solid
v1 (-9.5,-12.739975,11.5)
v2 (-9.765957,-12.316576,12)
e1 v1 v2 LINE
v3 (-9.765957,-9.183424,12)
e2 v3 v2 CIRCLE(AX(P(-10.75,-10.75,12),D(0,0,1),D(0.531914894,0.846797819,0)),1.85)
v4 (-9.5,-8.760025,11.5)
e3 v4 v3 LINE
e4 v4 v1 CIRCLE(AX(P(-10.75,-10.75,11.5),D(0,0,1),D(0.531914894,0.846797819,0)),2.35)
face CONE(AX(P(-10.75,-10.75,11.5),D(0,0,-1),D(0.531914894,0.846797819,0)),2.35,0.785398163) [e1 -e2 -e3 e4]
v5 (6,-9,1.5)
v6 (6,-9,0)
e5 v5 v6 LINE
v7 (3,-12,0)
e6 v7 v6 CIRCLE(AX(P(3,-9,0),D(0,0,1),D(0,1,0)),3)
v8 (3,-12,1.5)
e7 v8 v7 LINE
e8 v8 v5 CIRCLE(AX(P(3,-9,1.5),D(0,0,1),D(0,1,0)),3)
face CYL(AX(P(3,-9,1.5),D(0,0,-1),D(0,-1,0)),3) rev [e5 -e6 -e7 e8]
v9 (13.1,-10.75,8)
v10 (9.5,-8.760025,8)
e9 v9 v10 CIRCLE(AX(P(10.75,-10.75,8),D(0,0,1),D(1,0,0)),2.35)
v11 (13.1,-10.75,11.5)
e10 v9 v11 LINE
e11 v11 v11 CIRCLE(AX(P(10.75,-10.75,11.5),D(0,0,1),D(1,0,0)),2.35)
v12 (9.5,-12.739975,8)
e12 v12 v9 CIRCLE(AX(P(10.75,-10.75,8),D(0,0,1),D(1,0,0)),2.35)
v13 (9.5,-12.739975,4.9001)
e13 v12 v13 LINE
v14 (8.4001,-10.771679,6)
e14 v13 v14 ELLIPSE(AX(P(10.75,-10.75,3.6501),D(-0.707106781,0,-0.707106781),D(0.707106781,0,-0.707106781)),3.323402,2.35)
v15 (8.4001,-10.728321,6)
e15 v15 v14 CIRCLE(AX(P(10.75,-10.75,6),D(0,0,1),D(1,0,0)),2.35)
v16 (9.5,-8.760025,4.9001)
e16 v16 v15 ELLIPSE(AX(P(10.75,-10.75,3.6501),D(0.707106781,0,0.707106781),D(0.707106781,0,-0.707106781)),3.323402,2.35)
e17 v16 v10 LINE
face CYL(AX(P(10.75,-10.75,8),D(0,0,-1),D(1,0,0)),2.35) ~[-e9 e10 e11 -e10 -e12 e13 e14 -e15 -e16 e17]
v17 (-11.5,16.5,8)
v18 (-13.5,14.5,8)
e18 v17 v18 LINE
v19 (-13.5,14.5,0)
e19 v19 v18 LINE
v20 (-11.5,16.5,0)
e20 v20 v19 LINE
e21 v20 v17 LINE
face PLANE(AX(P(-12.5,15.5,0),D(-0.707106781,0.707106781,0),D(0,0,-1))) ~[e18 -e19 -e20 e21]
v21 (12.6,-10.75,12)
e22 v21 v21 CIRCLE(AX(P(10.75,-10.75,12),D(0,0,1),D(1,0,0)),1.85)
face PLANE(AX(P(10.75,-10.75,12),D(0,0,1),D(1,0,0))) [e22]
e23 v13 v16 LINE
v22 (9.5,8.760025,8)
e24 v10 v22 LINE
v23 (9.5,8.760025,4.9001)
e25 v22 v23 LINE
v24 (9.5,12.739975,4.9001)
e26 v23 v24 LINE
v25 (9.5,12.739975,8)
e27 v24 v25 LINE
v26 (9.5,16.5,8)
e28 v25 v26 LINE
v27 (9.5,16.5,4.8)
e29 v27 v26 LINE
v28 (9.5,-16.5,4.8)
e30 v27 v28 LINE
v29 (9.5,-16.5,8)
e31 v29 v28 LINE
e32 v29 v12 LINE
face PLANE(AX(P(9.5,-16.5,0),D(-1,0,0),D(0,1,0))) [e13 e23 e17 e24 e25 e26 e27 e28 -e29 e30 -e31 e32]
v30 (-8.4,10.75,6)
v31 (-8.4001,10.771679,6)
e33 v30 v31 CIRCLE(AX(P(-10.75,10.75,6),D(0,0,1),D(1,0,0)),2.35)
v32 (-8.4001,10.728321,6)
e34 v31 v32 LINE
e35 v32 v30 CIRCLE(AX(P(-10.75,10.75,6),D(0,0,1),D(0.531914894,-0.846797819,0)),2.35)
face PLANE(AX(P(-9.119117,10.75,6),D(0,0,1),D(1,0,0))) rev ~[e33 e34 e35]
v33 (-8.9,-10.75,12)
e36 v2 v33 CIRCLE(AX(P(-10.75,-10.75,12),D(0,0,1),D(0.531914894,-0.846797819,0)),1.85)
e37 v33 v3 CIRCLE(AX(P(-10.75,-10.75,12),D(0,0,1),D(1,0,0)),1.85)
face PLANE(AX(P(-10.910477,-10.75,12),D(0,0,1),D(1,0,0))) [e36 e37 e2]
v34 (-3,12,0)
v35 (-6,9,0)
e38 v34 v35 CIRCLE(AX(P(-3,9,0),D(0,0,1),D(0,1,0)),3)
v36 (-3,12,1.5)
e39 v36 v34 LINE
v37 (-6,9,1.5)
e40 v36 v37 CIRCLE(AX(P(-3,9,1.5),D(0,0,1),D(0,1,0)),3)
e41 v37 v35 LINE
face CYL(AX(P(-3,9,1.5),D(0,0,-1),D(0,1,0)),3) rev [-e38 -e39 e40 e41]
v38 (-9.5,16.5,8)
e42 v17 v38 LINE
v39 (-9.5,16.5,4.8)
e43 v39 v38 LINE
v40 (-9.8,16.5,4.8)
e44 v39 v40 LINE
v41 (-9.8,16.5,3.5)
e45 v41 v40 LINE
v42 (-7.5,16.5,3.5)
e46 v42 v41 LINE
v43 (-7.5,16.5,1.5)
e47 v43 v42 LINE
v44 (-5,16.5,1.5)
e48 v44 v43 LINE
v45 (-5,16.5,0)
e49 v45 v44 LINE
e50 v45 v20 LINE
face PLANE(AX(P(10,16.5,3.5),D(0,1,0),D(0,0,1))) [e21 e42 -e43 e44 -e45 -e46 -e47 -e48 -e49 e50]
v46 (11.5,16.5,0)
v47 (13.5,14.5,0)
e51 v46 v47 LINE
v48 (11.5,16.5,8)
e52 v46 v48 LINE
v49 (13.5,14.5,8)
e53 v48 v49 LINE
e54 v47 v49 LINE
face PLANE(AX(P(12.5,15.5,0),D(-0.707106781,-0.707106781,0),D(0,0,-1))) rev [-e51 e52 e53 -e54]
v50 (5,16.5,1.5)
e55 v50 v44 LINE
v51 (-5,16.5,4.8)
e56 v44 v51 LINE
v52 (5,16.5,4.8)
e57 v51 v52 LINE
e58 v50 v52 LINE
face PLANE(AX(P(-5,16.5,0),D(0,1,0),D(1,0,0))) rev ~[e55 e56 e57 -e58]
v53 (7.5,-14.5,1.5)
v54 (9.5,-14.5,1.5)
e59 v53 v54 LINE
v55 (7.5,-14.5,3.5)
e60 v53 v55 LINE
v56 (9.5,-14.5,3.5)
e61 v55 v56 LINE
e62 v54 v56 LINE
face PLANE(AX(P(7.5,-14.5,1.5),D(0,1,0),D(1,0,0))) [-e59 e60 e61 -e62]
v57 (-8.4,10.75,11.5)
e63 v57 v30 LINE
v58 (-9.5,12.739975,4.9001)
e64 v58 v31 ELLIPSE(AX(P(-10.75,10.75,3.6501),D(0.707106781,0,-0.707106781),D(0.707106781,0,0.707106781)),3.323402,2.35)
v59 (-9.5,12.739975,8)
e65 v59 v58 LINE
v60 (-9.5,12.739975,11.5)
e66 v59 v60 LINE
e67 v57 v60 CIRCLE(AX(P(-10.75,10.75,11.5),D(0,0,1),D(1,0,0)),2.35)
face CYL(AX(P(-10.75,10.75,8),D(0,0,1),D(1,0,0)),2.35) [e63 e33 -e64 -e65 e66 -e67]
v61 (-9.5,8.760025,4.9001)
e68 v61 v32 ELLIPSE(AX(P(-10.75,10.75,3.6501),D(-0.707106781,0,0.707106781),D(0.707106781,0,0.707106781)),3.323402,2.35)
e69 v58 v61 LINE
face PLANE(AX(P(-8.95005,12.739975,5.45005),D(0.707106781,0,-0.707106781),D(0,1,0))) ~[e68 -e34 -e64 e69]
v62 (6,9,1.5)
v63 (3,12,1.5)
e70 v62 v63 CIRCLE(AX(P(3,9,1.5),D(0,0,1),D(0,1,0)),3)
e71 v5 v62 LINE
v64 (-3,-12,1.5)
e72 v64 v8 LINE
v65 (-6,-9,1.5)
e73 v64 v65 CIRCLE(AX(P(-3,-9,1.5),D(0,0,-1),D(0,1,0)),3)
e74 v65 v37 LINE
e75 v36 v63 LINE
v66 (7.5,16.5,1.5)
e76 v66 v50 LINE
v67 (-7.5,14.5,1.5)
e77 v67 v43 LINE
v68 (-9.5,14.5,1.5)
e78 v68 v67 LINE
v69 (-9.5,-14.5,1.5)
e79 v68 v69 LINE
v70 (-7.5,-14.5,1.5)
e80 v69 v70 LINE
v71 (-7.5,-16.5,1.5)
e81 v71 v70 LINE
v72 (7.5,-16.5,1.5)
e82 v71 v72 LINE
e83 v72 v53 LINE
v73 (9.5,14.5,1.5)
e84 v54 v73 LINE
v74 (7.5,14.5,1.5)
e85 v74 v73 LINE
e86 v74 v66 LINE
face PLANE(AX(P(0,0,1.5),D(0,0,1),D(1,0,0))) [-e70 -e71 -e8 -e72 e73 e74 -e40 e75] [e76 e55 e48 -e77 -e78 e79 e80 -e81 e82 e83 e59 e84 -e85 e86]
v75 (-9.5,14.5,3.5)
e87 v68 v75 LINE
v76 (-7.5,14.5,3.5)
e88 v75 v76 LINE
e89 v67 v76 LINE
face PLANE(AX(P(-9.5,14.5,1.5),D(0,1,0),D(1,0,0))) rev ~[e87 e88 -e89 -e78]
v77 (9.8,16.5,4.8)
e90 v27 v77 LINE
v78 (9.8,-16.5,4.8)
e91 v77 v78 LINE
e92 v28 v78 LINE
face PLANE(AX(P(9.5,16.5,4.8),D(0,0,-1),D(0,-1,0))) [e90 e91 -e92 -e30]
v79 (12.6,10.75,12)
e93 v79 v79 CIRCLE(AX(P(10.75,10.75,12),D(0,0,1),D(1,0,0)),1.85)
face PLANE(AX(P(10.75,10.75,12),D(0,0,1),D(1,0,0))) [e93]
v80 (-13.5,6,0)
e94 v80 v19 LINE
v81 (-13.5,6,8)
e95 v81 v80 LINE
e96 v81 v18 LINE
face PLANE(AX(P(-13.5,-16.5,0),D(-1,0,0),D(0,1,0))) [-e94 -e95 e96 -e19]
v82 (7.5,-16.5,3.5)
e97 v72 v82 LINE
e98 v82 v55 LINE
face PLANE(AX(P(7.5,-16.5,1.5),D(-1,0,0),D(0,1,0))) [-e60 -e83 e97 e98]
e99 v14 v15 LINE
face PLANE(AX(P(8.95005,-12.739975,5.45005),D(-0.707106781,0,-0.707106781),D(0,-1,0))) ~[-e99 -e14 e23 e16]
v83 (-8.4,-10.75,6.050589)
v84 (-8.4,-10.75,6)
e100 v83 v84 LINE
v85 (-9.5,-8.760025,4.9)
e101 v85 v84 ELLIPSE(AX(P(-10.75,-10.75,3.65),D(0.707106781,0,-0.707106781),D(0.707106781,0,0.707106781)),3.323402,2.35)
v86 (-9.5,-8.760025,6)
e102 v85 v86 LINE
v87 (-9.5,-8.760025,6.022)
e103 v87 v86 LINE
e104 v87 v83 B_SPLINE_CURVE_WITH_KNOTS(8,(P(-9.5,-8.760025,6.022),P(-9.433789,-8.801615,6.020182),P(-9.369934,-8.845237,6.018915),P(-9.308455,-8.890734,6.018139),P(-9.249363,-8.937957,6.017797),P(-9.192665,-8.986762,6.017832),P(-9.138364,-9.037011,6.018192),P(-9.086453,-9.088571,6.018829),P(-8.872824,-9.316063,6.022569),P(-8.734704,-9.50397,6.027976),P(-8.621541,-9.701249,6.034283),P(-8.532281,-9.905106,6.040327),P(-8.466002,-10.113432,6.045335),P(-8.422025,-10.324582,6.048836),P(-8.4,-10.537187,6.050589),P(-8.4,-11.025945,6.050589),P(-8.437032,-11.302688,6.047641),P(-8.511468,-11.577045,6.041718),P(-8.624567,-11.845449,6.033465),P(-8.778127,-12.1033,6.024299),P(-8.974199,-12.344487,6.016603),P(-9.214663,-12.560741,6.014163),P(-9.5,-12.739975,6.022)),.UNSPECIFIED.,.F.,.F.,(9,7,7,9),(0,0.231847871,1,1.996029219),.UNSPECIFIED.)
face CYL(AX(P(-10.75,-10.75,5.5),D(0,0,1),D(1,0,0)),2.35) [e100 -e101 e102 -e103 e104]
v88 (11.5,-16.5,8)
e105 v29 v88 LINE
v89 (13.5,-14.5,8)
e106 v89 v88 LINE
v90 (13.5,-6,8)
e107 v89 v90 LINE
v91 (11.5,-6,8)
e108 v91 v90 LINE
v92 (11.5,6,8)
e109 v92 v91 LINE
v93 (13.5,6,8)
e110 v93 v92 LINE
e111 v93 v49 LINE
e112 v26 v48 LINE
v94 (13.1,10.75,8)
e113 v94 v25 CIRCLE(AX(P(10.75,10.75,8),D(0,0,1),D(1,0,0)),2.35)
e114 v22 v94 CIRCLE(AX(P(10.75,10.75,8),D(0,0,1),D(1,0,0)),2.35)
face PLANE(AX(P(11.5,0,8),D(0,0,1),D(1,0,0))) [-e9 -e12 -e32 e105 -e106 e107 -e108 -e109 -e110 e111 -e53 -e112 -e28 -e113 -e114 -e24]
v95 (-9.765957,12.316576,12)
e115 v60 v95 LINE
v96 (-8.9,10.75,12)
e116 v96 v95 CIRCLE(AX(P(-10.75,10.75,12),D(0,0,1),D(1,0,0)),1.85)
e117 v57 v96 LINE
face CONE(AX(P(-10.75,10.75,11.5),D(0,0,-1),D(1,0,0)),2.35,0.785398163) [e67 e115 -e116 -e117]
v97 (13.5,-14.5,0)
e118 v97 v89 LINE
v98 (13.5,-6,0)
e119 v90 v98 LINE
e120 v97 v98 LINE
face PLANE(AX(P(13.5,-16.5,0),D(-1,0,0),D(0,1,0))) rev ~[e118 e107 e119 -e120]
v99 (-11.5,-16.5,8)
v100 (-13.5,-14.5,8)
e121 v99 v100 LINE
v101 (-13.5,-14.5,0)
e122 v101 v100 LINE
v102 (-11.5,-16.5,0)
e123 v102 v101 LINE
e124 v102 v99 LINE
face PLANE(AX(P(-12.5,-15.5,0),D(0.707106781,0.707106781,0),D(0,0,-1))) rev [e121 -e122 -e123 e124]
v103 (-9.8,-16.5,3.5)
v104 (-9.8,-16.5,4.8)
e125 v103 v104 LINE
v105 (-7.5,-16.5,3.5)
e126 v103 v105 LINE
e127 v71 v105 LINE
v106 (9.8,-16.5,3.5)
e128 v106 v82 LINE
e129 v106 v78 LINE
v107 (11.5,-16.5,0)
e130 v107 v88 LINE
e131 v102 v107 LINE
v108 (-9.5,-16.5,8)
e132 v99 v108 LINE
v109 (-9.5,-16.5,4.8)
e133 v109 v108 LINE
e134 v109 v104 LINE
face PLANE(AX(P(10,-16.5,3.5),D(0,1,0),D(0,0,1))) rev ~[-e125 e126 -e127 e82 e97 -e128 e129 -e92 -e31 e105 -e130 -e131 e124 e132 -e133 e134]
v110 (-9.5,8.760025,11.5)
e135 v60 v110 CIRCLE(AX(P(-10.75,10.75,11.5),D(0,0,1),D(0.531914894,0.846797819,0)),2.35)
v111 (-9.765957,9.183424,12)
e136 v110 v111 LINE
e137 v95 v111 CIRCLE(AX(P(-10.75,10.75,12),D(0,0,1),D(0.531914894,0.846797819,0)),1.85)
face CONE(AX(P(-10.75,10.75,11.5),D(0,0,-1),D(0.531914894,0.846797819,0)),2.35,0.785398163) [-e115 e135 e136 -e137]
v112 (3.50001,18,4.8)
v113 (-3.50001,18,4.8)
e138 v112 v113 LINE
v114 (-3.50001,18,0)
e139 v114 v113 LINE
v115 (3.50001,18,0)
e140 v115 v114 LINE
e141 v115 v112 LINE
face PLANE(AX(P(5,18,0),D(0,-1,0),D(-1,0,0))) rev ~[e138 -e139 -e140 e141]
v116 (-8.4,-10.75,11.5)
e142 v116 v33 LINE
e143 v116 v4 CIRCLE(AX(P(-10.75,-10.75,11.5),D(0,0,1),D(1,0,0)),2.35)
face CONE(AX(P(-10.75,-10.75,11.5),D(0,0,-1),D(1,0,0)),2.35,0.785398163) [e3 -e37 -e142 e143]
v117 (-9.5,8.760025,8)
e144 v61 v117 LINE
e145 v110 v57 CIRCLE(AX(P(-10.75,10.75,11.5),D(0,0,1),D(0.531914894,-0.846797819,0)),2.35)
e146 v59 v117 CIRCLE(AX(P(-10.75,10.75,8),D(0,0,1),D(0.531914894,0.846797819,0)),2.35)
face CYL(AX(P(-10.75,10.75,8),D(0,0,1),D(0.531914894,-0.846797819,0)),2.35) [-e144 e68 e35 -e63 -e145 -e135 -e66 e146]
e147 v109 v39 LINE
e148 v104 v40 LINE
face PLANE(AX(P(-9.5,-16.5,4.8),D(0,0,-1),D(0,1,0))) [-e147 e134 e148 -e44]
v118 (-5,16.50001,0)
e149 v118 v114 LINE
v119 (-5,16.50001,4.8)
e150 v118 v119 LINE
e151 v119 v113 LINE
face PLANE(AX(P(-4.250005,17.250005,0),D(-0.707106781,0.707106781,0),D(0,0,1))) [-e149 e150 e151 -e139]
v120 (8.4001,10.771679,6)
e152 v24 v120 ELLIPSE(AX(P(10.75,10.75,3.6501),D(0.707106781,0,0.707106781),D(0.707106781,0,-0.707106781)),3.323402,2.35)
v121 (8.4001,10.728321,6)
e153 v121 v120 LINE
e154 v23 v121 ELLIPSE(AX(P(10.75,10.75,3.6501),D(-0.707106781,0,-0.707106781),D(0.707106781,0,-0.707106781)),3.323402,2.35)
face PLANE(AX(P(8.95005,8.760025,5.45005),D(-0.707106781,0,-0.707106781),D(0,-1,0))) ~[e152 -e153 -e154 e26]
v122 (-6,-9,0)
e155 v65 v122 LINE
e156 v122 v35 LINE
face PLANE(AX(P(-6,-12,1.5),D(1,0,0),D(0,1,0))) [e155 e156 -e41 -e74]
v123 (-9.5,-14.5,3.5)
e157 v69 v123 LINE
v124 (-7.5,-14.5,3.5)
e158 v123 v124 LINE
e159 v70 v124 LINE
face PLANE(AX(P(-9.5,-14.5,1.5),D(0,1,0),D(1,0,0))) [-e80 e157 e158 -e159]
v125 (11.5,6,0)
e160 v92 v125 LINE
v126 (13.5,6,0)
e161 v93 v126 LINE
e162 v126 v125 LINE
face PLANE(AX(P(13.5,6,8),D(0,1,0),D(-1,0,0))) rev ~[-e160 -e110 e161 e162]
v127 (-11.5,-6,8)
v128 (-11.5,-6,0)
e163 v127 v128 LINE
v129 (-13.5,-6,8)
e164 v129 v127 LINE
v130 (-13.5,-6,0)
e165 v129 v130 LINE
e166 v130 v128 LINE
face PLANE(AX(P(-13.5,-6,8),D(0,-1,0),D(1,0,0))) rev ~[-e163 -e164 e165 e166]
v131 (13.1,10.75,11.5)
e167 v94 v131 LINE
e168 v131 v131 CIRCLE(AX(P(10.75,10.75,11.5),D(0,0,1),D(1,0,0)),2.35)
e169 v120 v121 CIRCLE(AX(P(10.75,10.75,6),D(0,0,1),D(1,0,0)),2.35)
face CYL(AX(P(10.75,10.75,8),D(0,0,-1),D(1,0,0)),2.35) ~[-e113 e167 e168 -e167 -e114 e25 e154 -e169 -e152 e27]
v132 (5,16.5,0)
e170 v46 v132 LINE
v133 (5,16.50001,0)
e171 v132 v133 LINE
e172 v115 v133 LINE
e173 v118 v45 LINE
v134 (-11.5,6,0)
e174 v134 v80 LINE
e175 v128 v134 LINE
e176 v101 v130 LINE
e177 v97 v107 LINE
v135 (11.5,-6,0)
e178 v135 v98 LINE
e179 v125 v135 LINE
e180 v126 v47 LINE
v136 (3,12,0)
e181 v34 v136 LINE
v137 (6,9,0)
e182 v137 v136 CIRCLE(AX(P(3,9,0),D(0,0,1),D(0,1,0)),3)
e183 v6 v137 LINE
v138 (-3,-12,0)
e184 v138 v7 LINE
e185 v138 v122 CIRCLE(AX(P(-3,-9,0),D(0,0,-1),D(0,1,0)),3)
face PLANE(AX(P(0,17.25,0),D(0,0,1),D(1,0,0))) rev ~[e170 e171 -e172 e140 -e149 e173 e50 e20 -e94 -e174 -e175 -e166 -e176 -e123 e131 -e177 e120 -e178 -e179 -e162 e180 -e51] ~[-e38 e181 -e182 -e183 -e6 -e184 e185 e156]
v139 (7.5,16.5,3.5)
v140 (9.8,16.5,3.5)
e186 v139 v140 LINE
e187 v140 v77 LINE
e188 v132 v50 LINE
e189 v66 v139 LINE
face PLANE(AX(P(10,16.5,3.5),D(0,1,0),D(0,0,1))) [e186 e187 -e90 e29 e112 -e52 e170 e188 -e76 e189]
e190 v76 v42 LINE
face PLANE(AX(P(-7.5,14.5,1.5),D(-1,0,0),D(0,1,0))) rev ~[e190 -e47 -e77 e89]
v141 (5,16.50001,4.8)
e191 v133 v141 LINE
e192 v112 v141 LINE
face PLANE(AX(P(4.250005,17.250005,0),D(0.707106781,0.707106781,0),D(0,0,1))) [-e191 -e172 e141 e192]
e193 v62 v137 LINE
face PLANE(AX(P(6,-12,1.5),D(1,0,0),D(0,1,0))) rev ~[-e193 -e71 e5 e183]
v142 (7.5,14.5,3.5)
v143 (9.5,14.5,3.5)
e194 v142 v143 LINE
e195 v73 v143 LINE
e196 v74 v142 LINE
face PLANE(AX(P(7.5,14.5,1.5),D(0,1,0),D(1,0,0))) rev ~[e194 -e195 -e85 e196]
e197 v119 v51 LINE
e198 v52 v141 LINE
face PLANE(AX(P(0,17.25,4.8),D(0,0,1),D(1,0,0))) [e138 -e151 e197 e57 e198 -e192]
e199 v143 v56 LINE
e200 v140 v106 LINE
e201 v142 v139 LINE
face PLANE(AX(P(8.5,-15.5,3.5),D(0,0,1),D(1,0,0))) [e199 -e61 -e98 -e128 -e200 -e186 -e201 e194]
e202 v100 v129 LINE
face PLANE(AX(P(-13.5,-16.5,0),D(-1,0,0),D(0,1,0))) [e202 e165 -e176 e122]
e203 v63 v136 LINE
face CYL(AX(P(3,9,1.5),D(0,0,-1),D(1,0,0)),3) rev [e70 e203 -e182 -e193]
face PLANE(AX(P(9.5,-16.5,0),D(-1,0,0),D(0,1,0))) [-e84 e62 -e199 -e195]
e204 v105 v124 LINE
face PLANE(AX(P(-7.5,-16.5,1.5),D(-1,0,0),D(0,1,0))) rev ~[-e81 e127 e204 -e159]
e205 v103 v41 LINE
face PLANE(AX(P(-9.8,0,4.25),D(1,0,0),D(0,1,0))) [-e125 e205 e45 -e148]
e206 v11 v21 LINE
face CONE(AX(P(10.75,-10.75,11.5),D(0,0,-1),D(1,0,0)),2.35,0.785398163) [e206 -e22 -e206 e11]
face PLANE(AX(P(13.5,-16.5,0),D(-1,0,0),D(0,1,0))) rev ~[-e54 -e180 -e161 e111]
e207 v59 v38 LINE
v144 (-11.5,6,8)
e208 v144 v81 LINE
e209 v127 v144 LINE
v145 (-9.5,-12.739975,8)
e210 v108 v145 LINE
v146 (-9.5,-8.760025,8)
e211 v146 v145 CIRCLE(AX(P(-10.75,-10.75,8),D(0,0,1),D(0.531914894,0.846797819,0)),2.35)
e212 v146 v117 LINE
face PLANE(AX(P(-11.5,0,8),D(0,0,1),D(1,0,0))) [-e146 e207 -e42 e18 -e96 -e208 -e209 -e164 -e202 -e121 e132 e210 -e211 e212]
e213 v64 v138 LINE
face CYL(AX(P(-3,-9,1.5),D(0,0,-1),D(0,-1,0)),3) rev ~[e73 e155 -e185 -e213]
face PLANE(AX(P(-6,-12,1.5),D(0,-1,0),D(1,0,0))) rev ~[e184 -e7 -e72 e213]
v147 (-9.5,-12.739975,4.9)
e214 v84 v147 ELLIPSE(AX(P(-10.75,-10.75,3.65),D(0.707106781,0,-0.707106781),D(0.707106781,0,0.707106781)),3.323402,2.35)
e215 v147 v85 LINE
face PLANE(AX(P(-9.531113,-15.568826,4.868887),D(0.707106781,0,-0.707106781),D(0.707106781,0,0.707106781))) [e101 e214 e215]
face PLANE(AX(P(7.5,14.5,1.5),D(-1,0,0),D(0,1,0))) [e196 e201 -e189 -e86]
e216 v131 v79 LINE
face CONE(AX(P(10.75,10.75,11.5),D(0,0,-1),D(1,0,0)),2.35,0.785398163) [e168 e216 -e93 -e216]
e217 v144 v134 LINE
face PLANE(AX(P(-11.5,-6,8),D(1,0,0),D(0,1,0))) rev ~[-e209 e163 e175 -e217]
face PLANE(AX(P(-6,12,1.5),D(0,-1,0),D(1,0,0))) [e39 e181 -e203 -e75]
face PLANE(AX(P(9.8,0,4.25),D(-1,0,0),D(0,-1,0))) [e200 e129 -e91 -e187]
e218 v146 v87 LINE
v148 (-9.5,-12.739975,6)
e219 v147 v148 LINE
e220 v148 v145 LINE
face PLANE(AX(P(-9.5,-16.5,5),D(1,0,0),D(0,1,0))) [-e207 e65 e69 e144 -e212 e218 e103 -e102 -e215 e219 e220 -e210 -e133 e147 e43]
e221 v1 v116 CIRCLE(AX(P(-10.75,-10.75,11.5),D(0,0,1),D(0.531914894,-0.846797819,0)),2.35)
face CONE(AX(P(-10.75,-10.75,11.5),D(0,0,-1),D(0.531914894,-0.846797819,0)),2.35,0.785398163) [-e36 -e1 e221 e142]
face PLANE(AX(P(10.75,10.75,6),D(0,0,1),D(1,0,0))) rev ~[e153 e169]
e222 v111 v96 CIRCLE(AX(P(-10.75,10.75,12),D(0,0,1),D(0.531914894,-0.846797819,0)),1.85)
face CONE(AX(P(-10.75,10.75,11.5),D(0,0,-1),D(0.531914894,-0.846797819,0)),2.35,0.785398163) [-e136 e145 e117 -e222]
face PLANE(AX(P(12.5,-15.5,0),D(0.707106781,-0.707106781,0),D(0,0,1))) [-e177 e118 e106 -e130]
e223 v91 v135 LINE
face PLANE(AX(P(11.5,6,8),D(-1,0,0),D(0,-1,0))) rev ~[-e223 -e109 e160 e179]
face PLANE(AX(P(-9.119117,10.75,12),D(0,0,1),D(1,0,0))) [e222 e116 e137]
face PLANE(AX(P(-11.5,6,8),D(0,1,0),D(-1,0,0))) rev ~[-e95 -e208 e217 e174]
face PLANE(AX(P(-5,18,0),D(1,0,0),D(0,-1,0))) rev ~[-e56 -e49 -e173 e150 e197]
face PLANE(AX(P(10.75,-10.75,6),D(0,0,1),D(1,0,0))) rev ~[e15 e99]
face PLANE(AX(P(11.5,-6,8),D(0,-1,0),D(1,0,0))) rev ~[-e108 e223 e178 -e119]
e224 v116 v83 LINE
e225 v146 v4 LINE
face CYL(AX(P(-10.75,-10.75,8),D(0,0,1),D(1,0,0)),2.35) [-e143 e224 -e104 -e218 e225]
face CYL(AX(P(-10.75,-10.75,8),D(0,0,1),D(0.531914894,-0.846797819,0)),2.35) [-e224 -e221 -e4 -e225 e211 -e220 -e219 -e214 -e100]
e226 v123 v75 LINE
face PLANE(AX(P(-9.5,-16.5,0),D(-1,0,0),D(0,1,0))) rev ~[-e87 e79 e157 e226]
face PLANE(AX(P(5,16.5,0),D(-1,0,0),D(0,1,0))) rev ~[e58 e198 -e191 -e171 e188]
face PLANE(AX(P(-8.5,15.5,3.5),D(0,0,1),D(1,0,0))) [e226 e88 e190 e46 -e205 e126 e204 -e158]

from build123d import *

# Parameters (mm, degrees)
F1_DEPTH       = 1.5
F0_W           = 4
F0_H           = 33
F2_DEPTH       = 8
F3_W           = 33
F3_H           = 1.5
F4_DEPTH       = 0.5
F5_W           = 33
F5_H           = 1.5
F6_DEPTH       = 0.5
F7_W           = 2
F7_H           = 2
F8_DEPTH       = 2
F10_W          = 12
F10_H          = 24
F11_DEPTH      = 1.5
F13_DEPTH      = 25
F14_R          = 3
F9_R           = 2.35
F15_DEPTH      = 4
F16_DEPTH      = 2
F17_DEPTH      = 4
F17_DEPTH_BACK = 2
F18_DEPTH      = 0.2
F19_DEPTH      = 0.2
F20_DEPTH      = 0.2
F21_SIZE       = 0.5
F22_C1_SIZE    = 1.0999
F22_C2_SIZE    = 1.0999
F22_C3_SIZE    = 1.0999
F22_T7_DEPTH   = 9.637652322
F22_S8_R       = 2.35
F22_T9_DEPTH   = 6
F23_DEPTH      = 4.8
F24_SIZE       = 1.49999
F25_SIZE       = 2


# Not quite as in the source:
# - a fillet or chamfer that OpenCascade refuses, or shapes differently, is made with other operations: its cross-section is extruded or revolved along the edge and cut away or added
# - a fillet or chamfer is up to 0.001 mm smaller than in the source, because OpenCascade refuses the exact size


with BuildPart() as f1:
    # F0 (on Top) → F1 (new body)
    with BuildSketch(Plane.XY):
        Polygon((9.5, -16.5), (9.5, 16.5), (5, 16.5), (-5, 16.5), (-9.5, 16.5), (-9.5, -16.5), align=None)
    extrude(amount=F1_DEPTH)

    # F0 (on Top) → F2 (join)
    with BuildSketch(Plane.XY):
        with Locations((-11.5, 0)):
            Rectangle(F0_W, F0_H)
        with Locations((11.5, 0)):
            Rectangle(F0_W, F0_H)
    extrude(amount=F2_DEPTH)

    # F3 (on face) → F4 (cut)
    with BuildSketch(Plane.YZ.offset(-9.5)):
        with Locations((0, 4.25)):
            Rectangle(F3_W, F3_H)
    extrude(amount=-F4_DEPTH, mode=Mode.SUBTRACT)

    # F5 (on face) → F6 (cut)
    with BuildSketch(Plane(origin=(9.5, 0, 0), x_dir=(0, -1, 0), z_dir=(-1, 0, 0))):
        with Locations((0, 4.25)):
            Rectangle(F5_W, F5_H)
    extrude(amount=-F6_DEPTH, mode=Mode.SUBTRACT)

    # F7 (on face) → F8 (join)
    with BuildSketch(Plane.XY.offset(1.5)):
        with Locations((-8.5, 15.5)):
            Rectangle(F7_W, F7_H)
        with Locations((8.5, 15.5)):
            Rectangle(F7_W, F7_H)
        with Locations((8.5, -15.5)):
            Rectangle(F7_W, F7_H)
        with Locations((-8.5, -15.5)):
            Rectangle(F7_W, F7_H)
    extrude(amount=F8_DEPTH)

    # F10 (on face) → F11 (cut)
    with BuildSketch(Plane.XY.offset(1.5)):
        Rectangle(F10_W, F10_H)
    extrude(amount=-F11_DEPTH, mode=Mode.SUBTRACT)

    # F12 (on face) → F13 (cut)
    with BuildSketch(Plane.XY.offset(8)):
        Polygon((13.5, -6), (13.5, 6), (11.5, 6), (11.5, 0), (11.5, -6), align=None)
        Polygon((-11.5, 6), (-13.5, 6), (-13.5, -6), (-11.5, -6), (-11.5, 0), align=None)
    extrude(amount=-F13_DEPTH, mode=Mode.SUBTRACT)

    # F14
    f14_edges = [f1.edges().sort_by_distance(p)[0] for p in [
        (6, 12, 0.75),
        (-6, 12, 0.75),
        (-6, -12, 0.75),
        (6, -12, 0.75),
    ]]
    fillet(f14_edges, radius=F14_R)

    # F9 (on face) → F15 (join)
    with BuildSketch(Plane.XY.offset(8)):
        with BuildLine():
            Line((-9.5, 8.7600251258), (-9.5, 12.7399748742))
            ThreePointArc((-9.5, 12.7399748742), (-13.1, 10.75), (-9.5, 8.7600251258))
        make_face()
        with Locations((10.75, 10.75)):
            Circle(F9_R)
        with BuildLine():
            ThreePointArc((-8.4, -10.75), (-8.6933036199, -9.6131182999), (-9.5, -8.7600251258))
            Line((-9.5, -8.7600251258), (-9.5, -12.7399748742))
            ThreePointArc((-9.5, -12.7399748742), (-8.6933036199, -11.8868817001), (-8.4, -10.75))
        make_face()
        with Locations((10.75, -10.75)):
            Circle(F9_R)
    extrude(amount=F15_DEPTH)

    # F16 (add): faces of the model
    f16_faces = [f1.faces().sort_by_distance(p)[0] for p in [
        (9.0497739869, -10.75, 8),
        (9.0497739869, 10.75, 8),
    ]]
    extrude(f16_faces, amount=F16_DEPTH)

    # F9 (on face) → F17 (join, two sides)
    with BuildSketch(Plane.XY.offset(8)) as f17_sk:
        with BuildLine():
            ThreePointArc((-9.5, 8.7600251258), (-8.6933036199, 9.6131182999), (-8.4, 10.75))
            ThreePointArc((-8.4, 10.75), (-8.6933036199, 11.8868817001), (-9.5, 12.7399748742))
            Line((-9.5, 12.7399748742), (-9.5, 8.7600251258))
        make_face()
        with BuildLine():
            Line((-9.5, -12.7399748742), (-9.5, -8.7600251258))
            ThreePointArc((-9.5, -8.7600251258), (-13.1, -10.75), (-9.5, -12.7399748742))
        make_face()
        with BuildLine():
            ThreePointArc((-8.4, -10.75), (-8.6933036199, -9.6131182999), (-9.5, -8.7600251258))
            Line((-9.5, -8.7600251258), (-9.5, -12.7399748742))
            ThreePointArc((-9.5, -12.7399748742), (-8.6933036199, -11.8868817001), (-8.4, -10.75))
        make_face()
    extrude(amount=F17_DEPTH)
    extrude(f17_sk.sketch, amount=-F17_DEPTH_BACK)

    # F18 (add): faces of the model
    f18_faces = [f1.faces().sort_by_distance(p)[0] for p in [
        (-9.75, 0, 5),
        (9.75, 0, 5),
    ]]
    extrude(f18_faces, amount=F18_DEPTH)

    # F19 (add): a face of the model
    f19_faces = [f1.faces().sort_by_distance(p)[0] for p in [
        (-10, 0, 4.15),
    ]]
    extrude(f19_faces, amount=F19_DEPTH)

    # F20 (add): a face of the model
    f20_faces = [f1.faces().sort_by_distance(p)[0] for p in [
        (10, 0, 4.15),
    ]]
    extrude(f20_faces, amount=F20_DEPTH)

    # F21
    f21_edges = [f1.edges().sort_by_distance(p)[0] for p in [
        (8.4, 10.75, 12),
        (8.4, -10.75, 12),
        (-13.1, -10.75, 12),
        (-13.1, 10.75, 12),
        (-8.4, 10.75, 12),
        (-8.4, -10.75, 12),
    ]]
    chamfer(f21_edges, length=F21_SIZE)

    # F22: chamfer of 1.1 on 4 edges, made by hand

    # F22_c1 (size 1.1 in the source; OpenCascade refuses exactly that, so slightly less here)
    f22_c1_edges = [f1.edges().sort_by_distance(p)[0] for p in [
        (9.5, 10.75, 6),
    ]]
    chamfer(f22_c1_edges, length=F22_C1_SIZE)

    # F22_c2 (size 1.1 in the source; OpenCascade refuses exactly that, so slightly less here)
    f22_c2_edges = [f1.edges().sort_by_distance(p)[0] for p in [
        (9.5, -10.75, 6),
    ]]
    chamfer(f22_c2_edges, length=F22_C2_SIZE)

    # F22_c3 (size 1.1 in the source; OpenCascade refuses exactly that, so slightly less here)
    f22_c3_edges = [f1.edges().sort_by_distance(p)[0] for p in [
        (-9.5, 10.75, 6),
    ]]
    chamfer(f22_c3_edges, length=F22_C3_SIZE)


with BuildPart() as f22_tool5:
    # F22_s6 → F22_t7 (new body)
    with BuildSketch(Plane.XZ.offset(15.568826161)):
        with BuildLine():
            Line((-9.5311126984, 4.8688873016), (-8.3688873016, 6.0311126984))
            Line((-8.3688873016, 6.0311126984), (-8.3688873016, 6.0531126984))
            ThreePointArc((-8.3688873016, 6.0531126984), (-8.9344436508, 6.022), (-9.5, 6.022))
            Line((-9.5, 6.022), (-9.522, 6))
            ThreePointArc((-9.522, 6), (-9.522, 5.4344436508), (-9.5531126984, 4.8688873016))
            Line((-9.5531126984, 4.8688873016), (-9.5311126984, 4.8688873016))
        make_face()
    extrude(amount=-F22_T7_DEPTH)

    # F22_s8 → F22_t9 (intersect, symmetric)
    with BuildSketch(Plane.XY.offset(5.5)):
        with Locations((-10.75, -10.75)):
            Circle(F22_S8_R)
    extrude(amount=F22_T9_DEPTH, both=True, mode=Mode.INTERSECT)


with BuildPart() as f1_1:
    add(f1.part)

    # F22_t4: union F22_tool5
    add(f22_tool5.part)

    # F0 (on Top) → F23 (join, through all)
    with BuildSketch(Plane.XY):
        Polygon((-5, 16.5), (5, 16.5), (5, 18), (0, 18), (-5, 18), align=None)
    extrude(amount=F23_DEPTH)

    # F24 (size 1.5 in the source; OpenCascade refuses exactly that, so slightly less here)
    f24_edges = [f1_1.edges().sort_by_distance(p)[0] for p in [
        (-5, 18, 2.4),
        (5, 18, 2.4),
    ]]
    chamfer(f24_edges, length=F24_SIZE)

    # F25
    f25_edges = [f1_1.edges().sort_by_distance(p)[0] for p in [
        (13.5, -16.5, 4),
        (-13.5, -16.5, 4),
        (13.5, 16.5, 4),
        (-13.5, 16.5, 4),
    ]]
    chamfer(f25_edges, length=F25_SIZE)


solid = f1_1.part
